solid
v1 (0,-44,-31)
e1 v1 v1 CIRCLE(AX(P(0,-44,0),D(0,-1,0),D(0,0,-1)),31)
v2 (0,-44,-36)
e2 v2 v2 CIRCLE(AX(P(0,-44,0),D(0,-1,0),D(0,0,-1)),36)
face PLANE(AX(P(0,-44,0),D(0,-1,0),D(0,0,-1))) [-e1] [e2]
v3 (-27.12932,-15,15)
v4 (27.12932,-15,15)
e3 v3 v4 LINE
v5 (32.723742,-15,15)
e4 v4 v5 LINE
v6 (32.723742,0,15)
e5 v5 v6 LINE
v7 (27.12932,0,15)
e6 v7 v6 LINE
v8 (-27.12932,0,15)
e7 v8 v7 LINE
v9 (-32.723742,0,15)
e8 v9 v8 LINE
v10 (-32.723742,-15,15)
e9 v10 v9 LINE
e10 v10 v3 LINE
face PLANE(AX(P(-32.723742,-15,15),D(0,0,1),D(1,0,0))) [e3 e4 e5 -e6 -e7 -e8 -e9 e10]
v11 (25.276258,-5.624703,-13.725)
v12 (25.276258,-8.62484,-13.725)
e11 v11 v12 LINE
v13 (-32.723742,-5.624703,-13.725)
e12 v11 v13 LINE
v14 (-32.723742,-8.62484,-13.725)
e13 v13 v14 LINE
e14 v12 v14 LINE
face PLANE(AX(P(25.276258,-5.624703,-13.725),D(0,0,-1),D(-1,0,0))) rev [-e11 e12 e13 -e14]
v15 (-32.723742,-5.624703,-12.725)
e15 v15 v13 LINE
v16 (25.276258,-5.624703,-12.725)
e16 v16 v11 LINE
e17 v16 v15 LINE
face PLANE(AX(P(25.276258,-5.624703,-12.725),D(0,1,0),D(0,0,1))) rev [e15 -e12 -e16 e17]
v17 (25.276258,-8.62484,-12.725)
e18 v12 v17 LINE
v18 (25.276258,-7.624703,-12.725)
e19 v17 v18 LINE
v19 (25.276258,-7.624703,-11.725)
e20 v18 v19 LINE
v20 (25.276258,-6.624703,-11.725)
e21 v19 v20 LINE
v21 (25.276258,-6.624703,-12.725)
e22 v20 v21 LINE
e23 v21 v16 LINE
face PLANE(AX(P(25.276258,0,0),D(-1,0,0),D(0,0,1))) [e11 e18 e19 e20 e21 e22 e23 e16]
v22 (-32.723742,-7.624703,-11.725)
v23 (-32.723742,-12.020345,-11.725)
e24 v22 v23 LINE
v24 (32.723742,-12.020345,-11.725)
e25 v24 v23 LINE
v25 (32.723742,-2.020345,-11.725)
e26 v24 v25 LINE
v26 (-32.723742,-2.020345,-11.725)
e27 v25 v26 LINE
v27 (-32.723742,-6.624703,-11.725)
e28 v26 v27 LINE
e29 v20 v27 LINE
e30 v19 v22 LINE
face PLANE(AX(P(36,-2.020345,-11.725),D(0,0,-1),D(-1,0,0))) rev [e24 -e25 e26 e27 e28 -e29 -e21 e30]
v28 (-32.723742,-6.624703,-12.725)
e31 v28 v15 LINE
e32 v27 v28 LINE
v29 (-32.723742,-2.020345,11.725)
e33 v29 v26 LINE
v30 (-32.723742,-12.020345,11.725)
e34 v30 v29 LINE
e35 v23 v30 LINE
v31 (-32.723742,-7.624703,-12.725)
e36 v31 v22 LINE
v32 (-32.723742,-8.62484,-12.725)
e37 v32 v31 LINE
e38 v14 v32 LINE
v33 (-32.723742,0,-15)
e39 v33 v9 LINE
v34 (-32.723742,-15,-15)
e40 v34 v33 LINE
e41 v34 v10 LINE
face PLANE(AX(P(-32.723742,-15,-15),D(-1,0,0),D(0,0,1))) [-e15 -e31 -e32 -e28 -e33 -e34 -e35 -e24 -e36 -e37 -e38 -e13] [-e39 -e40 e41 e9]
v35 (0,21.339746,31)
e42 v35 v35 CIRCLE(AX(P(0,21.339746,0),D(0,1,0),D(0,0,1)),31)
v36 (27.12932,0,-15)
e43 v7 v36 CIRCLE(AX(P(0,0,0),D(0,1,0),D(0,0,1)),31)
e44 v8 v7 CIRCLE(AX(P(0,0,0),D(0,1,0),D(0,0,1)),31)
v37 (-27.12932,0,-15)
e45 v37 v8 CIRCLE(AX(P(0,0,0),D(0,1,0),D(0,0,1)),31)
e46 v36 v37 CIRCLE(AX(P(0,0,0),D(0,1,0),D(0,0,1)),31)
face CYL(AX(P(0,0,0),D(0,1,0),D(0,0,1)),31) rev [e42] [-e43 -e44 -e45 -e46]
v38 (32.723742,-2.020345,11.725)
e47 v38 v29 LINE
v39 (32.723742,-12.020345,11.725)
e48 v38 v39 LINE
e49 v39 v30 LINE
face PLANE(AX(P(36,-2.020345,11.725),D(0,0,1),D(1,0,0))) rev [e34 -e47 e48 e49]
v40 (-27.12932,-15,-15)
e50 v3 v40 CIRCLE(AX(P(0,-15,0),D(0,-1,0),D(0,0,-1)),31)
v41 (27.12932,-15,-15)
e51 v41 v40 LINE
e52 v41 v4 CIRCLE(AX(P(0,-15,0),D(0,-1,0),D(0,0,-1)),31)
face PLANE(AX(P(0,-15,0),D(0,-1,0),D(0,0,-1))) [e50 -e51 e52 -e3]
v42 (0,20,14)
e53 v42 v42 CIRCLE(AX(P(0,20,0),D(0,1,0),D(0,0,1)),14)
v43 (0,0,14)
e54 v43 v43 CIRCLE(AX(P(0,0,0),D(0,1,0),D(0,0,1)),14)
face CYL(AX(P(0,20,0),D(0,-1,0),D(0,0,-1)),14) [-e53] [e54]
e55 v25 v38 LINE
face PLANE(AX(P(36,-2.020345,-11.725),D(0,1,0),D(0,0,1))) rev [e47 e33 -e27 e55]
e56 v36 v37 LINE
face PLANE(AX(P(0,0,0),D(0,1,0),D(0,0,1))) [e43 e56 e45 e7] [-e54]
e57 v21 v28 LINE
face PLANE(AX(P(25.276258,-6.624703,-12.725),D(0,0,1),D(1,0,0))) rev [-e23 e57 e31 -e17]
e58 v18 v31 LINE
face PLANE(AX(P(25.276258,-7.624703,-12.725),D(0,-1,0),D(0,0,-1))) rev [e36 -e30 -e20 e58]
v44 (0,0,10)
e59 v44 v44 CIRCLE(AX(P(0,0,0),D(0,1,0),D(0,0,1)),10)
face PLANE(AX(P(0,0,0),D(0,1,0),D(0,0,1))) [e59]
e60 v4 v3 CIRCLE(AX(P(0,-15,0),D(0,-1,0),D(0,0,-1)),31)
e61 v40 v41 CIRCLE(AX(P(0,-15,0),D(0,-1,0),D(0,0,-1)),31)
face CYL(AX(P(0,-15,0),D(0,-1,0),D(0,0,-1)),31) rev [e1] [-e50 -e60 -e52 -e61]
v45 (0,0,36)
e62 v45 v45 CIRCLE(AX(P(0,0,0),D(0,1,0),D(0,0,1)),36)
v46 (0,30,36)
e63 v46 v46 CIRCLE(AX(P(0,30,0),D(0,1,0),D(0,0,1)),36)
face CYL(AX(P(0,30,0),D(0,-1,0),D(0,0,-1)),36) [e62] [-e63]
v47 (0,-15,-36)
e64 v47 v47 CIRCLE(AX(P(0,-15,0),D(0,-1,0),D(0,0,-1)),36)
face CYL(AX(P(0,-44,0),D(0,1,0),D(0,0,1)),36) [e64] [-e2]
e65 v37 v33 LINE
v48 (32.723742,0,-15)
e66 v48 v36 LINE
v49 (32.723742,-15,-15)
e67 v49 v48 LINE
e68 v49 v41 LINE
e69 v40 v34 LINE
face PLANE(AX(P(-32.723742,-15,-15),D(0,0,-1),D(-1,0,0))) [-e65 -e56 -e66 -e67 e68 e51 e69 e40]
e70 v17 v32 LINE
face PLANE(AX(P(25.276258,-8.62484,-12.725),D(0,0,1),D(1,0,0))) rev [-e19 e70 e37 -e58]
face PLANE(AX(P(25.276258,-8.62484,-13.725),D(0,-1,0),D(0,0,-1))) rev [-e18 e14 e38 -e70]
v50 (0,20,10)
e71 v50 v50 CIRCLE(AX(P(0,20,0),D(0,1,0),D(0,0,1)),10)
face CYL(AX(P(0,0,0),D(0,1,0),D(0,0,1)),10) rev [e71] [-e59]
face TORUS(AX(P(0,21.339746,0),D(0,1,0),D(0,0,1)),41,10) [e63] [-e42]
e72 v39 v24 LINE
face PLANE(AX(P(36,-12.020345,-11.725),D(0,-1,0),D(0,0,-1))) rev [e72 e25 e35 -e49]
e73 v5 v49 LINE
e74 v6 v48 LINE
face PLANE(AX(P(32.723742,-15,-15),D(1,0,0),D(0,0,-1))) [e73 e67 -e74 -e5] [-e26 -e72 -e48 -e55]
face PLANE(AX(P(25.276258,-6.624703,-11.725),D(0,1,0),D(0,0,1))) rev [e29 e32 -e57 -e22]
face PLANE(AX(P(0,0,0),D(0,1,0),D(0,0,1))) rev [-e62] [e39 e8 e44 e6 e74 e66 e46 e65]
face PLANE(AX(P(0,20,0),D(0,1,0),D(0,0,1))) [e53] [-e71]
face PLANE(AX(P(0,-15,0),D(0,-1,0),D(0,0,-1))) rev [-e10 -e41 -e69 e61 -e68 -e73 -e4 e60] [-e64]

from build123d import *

# Parameters (mm, degrees)
SKETCH_1_R          = 36
EXTRUDE_1_DEPTH     = 30
SKETCH_2_R          = 31
CUT_EXTRUDE_1_DEPTH = 30
FILLET_1_R          = 10
SKETCH_11_W         = 65.4474843869366
SKETCH_11_H         = 30.000000000000004
EXTRUDE_8_DEPTH     = 15
CUT_EXTRUDE_3_DEPTH = 84.18024249227881
CUT_EXTRUDE_4_DEPTH = 58.00000000000003
SKETCH_21_R         = 14
EXTRUDE_10_DEPTH    = 20
SKETCH_22_R         = 10
CUT_EXTRUDE_5_DEPTH = 20
EXTRUDE_START       = 29.000000000000004
SKETCH_23_R         = 36
EXTRUDE_11_DEPTH    = 29.000000000000004
CUT_EXTRUDE_START   = -29
SKETCH_24_R         = 31
CUT_EXTRUDE_7_DEPTH = 29


with BuildPart() as part:
    # 草圖1 → 填料-伸長1 (new body)
    with BuildSketch(Plane(origin=(0, 0, 0), x_dir=(1, 0, 0), z_dir=(0, 1, 0))):
        with Locations(Location((0, 0, 0), (0, 0, 270))):
            Circle(SKETCH_1_R)
    extrude(amount=EXTRUDE_1_DEPTH)

    # 草圖2 → 除料-伸長1 (cut)
    with BuildSketch(Plane(origin=(0, 30, 0), x_dir=(1, 0, 0), z_dir=(0, 1, 0))):
        with Locations(Location((0, 0, 0), (0, 0, 270))):
            Circle(SKETCH_2_R)
    extrude(amount=-CUT_EXTRUDE_1_DEPTH, mode=Mode.SUBTRACT)

    # 圓角1
    # the kernel refuses this fillet: 10 mm, written as the material it takes off along each edge
    with BuildSketch(Plane(origin=(0, 30, 0), x_dir=(-1.8e-16, 0, 1), z_dir=(-1, 0, -1.8e-16))) as fillet_1_piece_1:
        with BuildLine():
            CenterArc((41, -8.660254037844858), FILLET_1_R, 119.99999999999864, 60.000000000001364)
            Line((31.000000000000004, -8.660254037844858), (30.800000000000004, -8.660254037844858))
            Line((30.800000000000004, -8.660254037844858), (30.8, 0))
            Line((30.8, 0), (31, 0.1999999999999993))
            ThreePointArc((31, 0.1999999999999993), (33.5000000000001, 0.1999999999999993), (35.90000000000021, 0.17320508075653507))
            Line((35.90000000000021, 0.17320508075653507), (36.000000000000206, -3.5527e-13))
        make_face()
    revolve(axis=Axis((0, 30, 0), (0, 1, 0)), mode=Mode.SUBTRACT)

    # 草圖11 → 填料-伸長8 (add)
    with BuildSketch(Plane(origin=(0, 0, 0), x_dir=(1, 0, 0), z_dir=(0, 1, 0))):
        Rectangle(SKETCH_11_W, SKETCH_11_H)
    extrude(amount=-EXTRUDE_8_DEPTH)

    # 草圖16 → 除料-伸長3 (cut, through all)
    with BuildSketch(Plane.ZY.offset(32.7237421934683)):
        Polygon((-11.724999999999989, -2.02034535171655), (11.725000000000014, -2.02034535171655), (11.725000000000014, -12.02034535171655), (-11.724999999999985, -12.02034535171655), align=None)
    extrude(amount=-CUT_EXTRUDE_3_DEPTH, mode=Mode.SUBTRACT)

    # 草圖19 → 除料-伸長4 (cut)
    with BuildSketch(Plane.ZY.offset(32.7237421934683)):
        Polygon((-11.72500000000632, -6.624703450403075), (-12.725000000017417, -6.624703450403075), (-12.725000000017417, -5.624703450403075), (-13.725000000017417, -5.624703450403075), (-13.725000000017417, -8.624839762103937), (-12.725000000017417, -8.624839762103937), (-12.725000000017417, -7.624703450403074), (-11.72500000000632, -7.624703450403074), align=None)
    extrude(amount=-CUT_EXTRUDE_4_DEPTH, mode=Mode.SUBTRACT)

    # 草圖21 → 填料-伸長10 (add)
    with BuildSketch(Plane(origin=(0, 0, 0), x_dir=(1, 0, 0), z_dir=(0, 1, 0))):
        with Locations(Location((0, 0, 0), (0, 0, 270))):
            Circle(SKETCH_21_R)
    extrude(amount=EXTRUDE_10_DEPTH)

    # 草圖22 → 除料-伸長5 (cut)
    with BuildSketch(Plane(origin=(0, 20, 0), x_dir=(1, 0, 0), z_dir=(0, 1, 0))):
        with Locations(Location((0, 0, 0), (0, 0, 270))):
            Circle(SKETCH_22_R)
    extrude(amount=-CUT_EXTRUDE_5_DEPTH, mode=Mode.SUBTRACT)

    # 草圖23 → 填料-伸長11 (add)
    with BuildSketch(Plane.XZ.offset(15).offset(EXTRUDE_START)):
        with Locations(Location((0, 0, 0), (0, 0, 90))):
            Circle(SKETCH_23_R)
    extrude(amount=-EXTRUDE_11_DEPTH)

    # 草圖24 → 除料-伸長7 (cut)
    with BuildSketch(Plane.XZ.offset(44.00000000000001).offset(CUT_EXTRUDE_START)):
        with Locations(Location((0, 0, 0), (0, 0, 90))):
            Circle(SKETCH_24_R)
    extrude(amount=CUT_EXTRUDE_7_DEPTH, mode=Mode.SUBTRACT)


solid = part.part
